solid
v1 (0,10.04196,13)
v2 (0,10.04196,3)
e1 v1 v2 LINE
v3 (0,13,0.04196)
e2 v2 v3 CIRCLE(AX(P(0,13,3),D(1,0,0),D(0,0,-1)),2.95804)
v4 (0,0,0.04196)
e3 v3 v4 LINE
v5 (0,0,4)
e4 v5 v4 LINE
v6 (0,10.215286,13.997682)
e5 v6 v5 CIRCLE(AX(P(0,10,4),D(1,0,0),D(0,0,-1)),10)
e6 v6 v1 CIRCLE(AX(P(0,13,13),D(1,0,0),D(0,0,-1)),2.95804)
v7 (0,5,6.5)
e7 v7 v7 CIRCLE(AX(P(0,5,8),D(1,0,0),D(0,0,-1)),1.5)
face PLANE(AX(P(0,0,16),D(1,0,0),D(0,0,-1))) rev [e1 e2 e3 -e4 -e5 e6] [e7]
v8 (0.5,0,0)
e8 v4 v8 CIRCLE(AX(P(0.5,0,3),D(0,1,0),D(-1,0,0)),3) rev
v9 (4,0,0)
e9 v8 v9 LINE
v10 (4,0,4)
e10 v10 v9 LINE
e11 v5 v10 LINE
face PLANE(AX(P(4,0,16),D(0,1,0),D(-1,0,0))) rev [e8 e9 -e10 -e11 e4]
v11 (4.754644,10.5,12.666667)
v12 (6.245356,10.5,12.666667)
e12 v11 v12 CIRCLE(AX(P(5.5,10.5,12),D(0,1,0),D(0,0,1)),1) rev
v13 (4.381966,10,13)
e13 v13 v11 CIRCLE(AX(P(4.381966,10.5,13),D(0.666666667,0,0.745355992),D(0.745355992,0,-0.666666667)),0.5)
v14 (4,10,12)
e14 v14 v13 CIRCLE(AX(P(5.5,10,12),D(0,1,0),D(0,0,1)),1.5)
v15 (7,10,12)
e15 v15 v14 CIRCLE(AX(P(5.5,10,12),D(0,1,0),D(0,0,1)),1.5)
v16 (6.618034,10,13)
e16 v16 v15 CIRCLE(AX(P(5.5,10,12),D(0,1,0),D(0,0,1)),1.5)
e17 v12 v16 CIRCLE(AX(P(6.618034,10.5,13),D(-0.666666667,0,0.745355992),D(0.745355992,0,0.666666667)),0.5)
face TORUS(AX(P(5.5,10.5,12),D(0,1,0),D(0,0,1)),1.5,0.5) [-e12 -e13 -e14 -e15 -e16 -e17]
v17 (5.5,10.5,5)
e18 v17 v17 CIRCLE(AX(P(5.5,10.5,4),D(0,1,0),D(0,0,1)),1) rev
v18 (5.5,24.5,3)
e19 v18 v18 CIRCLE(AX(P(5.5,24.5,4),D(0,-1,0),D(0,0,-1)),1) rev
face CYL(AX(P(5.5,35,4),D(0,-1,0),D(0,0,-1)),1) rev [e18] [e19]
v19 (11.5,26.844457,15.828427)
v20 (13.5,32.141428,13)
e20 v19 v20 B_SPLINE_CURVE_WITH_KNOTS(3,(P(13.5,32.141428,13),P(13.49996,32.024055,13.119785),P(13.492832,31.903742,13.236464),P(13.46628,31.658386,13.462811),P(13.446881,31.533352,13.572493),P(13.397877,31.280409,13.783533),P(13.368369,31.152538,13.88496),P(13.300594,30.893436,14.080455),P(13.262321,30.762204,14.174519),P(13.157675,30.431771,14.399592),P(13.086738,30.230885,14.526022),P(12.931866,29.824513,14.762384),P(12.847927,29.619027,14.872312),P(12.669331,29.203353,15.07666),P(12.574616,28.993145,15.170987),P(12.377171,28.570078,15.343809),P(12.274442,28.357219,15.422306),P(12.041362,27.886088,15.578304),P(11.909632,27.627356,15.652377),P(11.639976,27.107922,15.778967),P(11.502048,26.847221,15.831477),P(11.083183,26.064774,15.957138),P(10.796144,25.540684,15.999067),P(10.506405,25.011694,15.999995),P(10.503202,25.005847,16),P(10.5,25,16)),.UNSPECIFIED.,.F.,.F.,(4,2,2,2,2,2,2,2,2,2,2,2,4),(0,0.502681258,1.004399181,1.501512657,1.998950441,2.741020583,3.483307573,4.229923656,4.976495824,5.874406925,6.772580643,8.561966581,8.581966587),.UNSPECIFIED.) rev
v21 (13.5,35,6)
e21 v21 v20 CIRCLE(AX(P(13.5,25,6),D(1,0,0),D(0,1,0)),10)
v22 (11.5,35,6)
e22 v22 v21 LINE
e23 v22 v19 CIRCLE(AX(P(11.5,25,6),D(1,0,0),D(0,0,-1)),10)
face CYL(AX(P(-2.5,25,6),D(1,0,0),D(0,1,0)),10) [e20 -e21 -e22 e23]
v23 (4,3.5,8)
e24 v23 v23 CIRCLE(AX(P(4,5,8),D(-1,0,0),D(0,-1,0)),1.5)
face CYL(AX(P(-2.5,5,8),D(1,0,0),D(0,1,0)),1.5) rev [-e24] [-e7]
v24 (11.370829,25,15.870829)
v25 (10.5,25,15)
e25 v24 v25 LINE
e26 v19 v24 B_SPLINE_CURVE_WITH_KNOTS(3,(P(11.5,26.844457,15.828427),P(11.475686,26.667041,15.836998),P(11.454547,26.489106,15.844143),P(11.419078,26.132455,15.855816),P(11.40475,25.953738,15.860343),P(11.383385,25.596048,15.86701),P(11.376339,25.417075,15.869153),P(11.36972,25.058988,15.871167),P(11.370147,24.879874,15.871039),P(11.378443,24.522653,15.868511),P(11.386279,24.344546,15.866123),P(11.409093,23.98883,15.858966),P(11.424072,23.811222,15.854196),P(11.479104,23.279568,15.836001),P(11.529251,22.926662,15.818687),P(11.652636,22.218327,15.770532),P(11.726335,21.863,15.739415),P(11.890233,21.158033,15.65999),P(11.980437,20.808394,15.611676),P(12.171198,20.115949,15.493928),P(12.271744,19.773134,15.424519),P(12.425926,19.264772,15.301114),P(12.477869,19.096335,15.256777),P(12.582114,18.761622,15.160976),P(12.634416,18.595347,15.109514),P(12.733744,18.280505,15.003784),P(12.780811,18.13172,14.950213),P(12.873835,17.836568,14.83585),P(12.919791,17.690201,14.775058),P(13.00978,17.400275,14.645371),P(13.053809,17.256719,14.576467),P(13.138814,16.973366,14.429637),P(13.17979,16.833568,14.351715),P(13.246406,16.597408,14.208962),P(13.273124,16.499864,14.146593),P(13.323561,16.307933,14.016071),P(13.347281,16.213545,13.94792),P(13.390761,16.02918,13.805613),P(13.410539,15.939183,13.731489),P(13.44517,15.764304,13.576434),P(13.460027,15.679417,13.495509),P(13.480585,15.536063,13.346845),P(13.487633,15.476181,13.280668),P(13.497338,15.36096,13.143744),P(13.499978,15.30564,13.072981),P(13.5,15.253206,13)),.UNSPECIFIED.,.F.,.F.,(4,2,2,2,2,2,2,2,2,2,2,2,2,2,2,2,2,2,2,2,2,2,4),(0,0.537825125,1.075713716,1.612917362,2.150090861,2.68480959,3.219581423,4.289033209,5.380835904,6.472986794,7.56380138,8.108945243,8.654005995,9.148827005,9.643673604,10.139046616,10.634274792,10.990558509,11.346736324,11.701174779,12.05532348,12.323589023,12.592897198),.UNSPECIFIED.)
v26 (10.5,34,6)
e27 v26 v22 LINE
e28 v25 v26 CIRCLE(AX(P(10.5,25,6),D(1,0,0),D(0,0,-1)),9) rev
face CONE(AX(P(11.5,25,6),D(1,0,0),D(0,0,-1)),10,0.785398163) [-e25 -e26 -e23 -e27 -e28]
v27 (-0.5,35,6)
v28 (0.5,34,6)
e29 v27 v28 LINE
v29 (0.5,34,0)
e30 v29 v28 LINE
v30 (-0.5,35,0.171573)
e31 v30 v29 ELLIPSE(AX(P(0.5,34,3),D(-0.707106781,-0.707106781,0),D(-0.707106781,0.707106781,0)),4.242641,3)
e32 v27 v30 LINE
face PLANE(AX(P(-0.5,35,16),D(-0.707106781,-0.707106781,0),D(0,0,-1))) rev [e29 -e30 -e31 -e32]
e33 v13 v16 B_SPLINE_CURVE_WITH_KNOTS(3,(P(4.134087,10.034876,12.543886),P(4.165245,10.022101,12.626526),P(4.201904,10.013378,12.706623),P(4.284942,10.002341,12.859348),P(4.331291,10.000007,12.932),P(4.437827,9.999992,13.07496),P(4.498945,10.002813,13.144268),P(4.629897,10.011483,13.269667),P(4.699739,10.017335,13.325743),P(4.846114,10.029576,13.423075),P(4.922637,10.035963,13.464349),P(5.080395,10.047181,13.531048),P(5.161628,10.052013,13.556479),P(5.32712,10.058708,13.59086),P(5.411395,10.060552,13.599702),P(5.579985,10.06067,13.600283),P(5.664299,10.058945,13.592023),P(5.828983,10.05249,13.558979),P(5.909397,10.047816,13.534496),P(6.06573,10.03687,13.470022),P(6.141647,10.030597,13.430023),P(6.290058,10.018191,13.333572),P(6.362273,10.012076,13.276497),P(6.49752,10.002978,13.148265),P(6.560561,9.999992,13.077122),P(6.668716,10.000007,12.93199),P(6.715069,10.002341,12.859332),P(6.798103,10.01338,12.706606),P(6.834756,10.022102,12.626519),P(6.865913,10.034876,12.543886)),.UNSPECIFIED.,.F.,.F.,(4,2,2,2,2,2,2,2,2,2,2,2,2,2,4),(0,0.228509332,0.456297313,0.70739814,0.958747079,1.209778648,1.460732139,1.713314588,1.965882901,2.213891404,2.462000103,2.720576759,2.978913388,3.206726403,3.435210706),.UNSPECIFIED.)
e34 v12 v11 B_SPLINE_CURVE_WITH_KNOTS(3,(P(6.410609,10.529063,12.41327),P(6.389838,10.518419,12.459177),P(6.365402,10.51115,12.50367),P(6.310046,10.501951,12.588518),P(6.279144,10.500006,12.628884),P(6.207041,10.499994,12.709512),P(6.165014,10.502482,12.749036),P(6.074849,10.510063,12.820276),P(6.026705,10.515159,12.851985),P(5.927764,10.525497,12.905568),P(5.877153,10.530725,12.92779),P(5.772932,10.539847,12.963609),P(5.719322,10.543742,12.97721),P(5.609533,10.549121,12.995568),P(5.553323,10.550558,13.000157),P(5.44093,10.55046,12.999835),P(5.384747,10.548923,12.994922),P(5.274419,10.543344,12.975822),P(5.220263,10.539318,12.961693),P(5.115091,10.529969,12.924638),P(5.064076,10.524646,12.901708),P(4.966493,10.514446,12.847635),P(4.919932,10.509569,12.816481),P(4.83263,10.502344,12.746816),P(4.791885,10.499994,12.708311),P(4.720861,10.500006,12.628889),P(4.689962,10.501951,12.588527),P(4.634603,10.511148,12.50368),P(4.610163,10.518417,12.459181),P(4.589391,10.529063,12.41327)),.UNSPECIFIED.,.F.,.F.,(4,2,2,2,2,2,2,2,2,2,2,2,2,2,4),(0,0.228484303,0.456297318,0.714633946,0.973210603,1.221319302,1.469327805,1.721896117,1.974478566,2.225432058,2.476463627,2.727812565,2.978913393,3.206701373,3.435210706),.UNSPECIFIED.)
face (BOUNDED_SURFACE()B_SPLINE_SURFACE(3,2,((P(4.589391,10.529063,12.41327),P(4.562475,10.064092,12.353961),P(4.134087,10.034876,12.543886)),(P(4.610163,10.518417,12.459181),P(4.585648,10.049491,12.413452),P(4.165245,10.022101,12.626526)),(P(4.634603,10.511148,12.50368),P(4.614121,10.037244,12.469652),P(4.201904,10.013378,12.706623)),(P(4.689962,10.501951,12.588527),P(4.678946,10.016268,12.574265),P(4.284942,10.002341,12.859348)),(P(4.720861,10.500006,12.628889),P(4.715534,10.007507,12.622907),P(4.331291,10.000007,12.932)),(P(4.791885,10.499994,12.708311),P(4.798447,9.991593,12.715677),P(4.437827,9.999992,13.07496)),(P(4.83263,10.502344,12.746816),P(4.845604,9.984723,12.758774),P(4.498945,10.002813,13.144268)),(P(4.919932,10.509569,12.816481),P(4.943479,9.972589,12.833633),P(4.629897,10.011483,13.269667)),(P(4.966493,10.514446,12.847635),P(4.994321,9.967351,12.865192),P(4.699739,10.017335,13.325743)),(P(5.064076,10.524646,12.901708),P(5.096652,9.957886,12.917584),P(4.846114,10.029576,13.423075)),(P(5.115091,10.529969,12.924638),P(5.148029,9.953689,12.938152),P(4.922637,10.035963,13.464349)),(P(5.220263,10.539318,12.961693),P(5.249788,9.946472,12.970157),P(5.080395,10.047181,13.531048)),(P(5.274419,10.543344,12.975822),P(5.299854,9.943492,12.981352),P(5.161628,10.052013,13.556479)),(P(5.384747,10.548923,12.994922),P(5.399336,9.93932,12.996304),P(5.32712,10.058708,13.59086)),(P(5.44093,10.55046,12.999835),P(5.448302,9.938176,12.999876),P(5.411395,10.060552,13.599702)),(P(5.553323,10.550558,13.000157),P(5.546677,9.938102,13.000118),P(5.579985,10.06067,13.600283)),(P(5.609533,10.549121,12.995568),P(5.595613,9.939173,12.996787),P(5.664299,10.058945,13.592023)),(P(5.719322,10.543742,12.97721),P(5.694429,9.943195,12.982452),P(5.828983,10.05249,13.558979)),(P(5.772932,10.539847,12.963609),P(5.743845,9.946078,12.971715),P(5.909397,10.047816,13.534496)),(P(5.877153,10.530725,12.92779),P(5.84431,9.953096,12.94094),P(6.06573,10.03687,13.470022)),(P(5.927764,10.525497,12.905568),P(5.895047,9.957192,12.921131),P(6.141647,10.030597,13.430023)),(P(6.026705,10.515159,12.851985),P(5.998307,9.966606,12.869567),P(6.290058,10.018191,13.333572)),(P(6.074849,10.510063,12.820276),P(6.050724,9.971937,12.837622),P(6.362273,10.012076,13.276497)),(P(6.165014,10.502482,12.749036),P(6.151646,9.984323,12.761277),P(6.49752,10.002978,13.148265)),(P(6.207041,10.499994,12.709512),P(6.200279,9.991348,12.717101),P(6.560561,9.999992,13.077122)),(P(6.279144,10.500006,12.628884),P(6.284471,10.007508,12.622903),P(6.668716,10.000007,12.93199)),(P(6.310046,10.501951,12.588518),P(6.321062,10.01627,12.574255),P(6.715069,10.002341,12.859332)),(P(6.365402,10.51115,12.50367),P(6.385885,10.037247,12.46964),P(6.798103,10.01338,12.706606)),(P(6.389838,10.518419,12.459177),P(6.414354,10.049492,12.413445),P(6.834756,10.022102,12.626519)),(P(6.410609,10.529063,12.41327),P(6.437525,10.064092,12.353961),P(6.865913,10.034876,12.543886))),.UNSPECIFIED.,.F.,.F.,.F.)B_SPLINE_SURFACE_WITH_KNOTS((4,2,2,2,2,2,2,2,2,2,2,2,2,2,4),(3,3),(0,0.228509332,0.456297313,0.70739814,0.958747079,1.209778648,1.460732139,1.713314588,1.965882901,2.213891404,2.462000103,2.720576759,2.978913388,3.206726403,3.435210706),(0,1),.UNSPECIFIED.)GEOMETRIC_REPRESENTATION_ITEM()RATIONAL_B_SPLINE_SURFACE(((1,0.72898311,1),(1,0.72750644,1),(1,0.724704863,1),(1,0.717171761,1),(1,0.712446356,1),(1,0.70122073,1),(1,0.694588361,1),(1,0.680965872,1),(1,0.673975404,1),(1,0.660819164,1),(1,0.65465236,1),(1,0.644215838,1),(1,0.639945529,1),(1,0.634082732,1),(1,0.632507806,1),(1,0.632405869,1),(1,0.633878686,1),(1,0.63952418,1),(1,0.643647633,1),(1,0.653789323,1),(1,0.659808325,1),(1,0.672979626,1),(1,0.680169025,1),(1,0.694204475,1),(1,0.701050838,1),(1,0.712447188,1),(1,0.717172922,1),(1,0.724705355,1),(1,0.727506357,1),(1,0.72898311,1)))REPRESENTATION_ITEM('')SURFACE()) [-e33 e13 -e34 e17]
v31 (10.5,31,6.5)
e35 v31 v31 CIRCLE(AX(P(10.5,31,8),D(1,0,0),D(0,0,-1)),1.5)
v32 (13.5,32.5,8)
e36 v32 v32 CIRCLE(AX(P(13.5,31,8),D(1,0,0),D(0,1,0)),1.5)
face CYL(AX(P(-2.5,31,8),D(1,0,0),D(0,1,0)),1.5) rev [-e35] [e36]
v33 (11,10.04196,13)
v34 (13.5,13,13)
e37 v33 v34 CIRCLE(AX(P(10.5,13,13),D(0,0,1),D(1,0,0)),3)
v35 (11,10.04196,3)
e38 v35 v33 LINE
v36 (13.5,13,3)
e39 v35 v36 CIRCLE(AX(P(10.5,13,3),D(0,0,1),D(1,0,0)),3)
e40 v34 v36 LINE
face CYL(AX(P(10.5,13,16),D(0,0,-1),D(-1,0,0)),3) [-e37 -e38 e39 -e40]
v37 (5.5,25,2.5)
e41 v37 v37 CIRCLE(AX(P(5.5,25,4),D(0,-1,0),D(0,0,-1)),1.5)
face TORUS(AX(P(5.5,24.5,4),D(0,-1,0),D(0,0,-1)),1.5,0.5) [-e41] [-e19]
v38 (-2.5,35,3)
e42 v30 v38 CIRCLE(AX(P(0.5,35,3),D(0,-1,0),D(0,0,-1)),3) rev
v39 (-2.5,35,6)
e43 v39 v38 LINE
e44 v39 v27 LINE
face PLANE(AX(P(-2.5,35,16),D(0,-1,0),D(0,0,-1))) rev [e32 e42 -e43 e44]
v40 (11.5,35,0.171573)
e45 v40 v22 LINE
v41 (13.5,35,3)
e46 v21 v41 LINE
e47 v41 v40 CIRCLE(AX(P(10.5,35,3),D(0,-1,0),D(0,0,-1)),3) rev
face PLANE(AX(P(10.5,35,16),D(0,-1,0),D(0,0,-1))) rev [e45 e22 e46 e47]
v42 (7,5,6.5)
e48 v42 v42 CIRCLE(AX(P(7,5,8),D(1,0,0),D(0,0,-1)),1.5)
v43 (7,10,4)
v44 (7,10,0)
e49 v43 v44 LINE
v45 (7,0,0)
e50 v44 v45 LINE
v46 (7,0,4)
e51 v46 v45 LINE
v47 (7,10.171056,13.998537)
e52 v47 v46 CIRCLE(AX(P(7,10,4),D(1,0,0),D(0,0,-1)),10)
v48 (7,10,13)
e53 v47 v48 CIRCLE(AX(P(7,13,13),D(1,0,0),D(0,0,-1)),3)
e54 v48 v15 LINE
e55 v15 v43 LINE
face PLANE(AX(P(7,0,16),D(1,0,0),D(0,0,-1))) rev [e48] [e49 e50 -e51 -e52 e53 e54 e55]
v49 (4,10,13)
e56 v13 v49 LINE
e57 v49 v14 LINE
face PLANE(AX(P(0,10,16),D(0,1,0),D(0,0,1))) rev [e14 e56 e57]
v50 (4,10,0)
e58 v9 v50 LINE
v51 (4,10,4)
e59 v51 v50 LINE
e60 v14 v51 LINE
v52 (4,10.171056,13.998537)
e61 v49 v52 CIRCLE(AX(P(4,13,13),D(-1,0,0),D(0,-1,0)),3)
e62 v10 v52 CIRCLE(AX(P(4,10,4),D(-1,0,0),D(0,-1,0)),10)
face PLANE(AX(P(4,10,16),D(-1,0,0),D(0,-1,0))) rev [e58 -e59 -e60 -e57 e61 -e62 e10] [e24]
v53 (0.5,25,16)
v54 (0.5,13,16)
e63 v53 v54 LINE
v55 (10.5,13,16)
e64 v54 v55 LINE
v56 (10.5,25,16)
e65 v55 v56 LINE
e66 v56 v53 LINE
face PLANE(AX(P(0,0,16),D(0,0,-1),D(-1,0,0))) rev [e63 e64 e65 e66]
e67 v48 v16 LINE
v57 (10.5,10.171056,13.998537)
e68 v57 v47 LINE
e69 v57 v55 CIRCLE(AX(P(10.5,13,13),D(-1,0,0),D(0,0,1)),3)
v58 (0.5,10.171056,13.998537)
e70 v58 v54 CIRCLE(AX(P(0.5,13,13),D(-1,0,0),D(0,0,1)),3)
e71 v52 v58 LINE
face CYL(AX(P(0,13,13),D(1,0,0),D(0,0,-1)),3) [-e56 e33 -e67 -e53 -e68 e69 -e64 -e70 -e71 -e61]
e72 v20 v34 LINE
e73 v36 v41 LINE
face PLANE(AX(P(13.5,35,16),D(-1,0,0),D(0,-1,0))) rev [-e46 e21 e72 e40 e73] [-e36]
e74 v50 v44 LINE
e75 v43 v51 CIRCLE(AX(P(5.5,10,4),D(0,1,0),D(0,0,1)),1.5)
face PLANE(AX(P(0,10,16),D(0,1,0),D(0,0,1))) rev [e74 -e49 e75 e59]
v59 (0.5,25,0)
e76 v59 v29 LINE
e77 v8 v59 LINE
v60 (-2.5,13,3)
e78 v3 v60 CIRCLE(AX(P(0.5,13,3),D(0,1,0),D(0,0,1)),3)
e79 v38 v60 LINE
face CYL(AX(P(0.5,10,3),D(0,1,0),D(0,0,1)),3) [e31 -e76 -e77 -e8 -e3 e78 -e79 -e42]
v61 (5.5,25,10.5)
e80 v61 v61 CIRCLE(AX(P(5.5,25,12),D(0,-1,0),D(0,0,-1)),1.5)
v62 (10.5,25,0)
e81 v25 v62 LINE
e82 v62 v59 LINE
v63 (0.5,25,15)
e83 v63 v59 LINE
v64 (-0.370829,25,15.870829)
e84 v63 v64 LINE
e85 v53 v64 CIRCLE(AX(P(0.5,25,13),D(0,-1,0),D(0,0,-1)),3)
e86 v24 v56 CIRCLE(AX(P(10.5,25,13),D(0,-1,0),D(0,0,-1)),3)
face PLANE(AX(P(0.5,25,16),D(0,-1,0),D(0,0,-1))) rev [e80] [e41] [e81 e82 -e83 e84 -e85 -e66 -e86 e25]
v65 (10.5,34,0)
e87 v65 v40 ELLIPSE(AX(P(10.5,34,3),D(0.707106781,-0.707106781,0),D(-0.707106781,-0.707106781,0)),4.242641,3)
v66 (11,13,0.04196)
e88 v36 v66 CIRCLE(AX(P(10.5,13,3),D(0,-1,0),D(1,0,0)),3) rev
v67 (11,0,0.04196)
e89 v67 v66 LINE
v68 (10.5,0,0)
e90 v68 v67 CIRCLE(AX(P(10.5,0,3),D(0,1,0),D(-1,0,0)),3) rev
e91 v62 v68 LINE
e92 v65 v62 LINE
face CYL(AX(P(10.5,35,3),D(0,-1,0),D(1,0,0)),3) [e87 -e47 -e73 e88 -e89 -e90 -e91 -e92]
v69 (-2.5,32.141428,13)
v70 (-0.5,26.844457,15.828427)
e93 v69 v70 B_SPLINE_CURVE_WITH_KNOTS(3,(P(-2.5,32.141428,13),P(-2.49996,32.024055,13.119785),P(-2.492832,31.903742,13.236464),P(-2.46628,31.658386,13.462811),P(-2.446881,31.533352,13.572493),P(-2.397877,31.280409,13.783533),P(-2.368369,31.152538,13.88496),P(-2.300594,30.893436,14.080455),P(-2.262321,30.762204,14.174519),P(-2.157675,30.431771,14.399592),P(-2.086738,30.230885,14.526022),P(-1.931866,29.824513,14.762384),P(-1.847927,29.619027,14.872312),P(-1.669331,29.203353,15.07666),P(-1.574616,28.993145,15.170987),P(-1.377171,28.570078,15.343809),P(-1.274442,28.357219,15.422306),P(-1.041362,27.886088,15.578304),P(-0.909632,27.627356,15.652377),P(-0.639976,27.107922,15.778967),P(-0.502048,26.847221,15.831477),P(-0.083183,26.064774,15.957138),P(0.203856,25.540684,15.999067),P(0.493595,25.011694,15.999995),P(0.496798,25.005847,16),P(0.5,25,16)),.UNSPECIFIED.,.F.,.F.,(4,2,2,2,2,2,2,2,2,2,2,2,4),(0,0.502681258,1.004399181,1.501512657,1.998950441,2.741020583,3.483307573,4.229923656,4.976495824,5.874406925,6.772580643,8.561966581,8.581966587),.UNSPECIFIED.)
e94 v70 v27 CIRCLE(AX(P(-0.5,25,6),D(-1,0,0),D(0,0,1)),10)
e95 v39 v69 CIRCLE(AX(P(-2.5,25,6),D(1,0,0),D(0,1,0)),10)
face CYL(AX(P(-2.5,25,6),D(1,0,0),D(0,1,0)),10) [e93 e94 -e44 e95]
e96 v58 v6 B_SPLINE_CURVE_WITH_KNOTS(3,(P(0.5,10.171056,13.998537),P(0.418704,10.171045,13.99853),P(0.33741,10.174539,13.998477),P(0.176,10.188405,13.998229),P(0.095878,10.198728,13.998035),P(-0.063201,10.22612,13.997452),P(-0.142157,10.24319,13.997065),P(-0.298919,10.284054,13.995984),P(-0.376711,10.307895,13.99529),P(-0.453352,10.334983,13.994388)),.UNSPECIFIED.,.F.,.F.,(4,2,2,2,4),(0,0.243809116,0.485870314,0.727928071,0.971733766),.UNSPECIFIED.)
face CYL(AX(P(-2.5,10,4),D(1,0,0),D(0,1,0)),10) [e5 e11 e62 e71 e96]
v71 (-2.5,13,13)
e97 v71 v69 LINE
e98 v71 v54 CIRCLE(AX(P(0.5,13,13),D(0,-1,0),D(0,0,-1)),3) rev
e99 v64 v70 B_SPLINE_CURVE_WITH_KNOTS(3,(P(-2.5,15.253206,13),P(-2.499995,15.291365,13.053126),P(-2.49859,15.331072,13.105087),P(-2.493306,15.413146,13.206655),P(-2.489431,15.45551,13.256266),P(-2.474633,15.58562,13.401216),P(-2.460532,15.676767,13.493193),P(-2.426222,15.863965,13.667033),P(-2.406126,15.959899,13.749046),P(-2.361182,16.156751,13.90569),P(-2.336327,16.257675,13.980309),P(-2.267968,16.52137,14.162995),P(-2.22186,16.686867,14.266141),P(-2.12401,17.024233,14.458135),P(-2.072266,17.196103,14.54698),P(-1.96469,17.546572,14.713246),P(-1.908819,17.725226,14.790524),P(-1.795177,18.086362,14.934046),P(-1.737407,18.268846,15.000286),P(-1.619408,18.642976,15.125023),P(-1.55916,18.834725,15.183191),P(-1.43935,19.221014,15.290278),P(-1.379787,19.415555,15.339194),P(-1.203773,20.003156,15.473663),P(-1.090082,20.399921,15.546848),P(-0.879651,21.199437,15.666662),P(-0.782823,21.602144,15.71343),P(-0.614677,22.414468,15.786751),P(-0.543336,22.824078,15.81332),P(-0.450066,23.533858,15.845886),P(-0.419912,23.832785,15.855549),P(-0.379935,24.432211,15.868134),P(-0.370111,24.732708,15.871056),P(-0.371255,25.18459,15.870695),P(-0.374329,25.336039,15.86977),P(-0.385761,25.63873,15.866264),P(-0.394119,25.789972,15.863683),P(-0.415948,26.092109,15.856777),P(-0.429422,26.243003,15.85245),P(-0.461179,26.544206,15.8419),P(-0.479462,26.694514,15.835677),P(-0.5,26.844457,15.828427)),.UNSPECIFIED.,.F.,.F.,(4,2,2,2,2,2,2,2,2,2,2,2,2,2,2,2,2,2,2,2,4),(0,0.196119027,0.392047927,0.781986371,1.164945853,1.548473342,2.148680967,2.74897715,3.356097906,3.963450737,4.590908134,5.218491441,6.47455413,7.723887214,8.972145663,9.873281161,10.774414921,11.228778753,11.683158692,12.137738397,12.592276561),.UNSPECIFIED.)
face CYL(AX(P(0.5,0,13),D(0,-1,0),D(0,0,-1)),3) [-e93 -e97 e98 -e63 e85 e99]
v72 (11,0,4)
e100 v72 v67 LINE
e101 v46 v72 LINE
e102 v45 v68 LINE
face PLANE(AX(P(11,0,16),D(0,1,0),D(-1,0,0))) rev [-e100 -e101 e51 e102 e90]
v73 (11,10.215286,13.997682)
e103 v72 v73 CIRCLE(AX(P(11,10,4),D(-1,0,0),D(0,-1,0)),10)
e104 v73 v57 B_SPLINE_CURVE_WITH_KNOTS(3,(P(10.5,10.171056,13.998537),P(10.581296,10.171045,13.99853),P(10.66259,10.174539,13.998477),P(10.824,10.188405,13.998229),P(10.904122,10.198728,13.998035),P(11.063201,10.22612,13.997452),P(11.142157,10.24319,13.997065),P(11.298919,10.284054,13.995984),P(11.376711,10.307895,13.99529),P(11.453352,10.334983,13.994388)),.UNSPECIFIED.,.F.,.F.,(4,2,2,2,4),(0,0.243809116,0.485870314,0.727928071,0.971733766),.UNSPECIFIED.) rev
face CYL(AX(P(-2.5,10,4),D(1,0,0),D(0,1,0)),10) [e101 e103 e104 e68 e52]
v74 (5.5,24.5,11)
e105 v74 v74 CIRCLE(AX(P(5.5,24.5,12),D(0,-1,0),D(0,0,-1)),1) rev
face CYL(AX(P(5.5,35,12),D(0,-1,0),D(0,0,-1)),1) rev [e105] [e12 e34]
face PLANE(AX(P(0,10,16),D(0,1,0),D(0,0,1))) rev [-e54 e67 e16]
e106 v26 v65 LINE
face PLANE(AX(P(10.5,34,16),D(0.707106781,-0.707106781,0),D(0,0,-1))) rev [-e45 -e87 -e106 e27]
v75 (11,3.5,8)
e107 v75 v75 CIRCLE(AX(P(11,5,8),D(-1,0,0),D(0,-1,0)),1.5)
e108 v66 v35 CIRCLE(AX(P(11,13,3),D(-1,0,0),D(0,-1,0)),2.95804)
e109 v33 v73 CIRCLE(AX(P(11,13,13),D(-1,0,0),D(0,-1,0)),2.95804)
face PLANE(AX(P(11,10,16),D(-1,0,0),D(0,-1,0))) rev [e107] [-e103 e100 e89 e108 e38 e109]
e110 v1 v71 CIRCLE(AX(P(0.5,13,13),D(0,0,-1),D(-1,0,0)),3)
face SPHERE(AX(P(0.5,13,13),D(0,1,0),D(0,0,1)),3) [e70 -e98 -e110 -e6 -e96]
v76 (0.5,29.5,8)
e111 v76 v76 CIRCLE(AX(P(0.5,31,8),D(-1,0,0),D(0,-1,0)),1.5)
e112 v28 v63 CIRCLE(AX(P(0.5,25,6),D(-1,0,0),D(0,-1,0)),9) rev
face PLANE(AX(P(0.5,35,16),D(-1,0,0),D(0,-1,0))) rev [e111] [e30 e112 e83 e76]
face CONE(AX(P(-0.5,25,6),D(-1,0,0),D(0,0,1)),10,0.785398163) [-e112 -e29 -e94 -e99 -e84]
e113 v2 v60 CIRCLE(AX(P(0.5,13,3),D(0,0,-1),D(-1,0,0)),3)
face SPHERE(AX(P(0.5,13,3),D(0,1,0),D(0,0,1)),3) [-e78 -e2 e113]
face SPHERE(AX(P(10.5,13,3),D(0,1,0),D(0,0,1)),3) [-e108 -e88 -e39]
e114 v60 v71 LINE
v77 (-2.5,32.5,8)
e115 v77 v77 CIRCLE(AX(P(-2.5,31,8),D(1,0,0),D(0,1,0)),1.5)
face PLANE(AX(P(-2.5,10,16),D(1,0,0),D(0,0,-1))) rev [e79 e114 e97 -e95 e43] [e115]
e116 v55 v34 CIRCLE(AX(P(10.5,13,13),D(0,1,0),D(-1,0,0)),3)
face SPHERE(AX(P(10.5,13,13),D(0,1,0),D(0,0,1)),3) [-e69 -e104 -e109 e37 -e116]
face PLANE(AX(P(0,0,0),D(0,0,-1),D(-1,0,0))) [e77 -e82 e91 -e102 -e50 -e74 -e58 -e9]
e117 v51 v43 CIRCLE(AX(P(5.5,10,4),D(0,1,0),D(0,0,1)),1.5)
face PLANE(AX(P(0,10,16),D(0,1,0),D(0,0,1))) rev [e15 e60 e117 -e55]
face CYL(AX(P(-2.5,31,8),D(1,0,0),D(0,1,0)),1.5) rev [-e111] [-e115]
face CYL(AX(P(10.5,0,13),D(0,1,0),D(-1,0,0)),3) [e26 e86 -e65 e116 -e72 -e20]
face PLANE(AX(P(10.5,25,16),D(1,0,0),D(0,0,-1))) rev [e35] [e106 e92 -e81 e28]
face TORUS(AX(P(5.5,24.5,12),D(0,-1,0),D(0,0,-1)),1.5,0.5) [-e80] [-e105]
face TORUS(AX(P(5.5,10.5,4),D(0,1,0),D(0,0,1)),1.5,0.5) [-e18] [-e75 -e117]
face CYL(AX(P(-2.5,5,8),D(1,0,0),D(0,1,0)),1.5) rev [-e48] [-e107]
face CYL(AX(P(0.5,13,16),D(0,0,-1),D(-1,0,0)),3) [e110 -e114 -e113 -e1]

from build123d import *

# Parameters (mm, degrees)
BOSS_EXTRUDE1_DEPTH     = 16
CUT_EXTRUDE1_DEPTH      = 41.782962129
CUT_EXTRUDE1_DEPTH_BACK = 41.782962129
SKETCH2_R               = 1.5
FILLET1_DEPTH           = 35
SKETCH3_R               = 1
CUT_EXTRUDE2_DEPTH      = 33.607514639
CONG_2_R                = 3
CHAMFER3_SIZE           = 1
CONG_1_R                = 0.5


with BuildPart() as part:
    # Sketch1 → Boss-Extrude1 (new body)
    with BuildSketch(Plane.XY):
        Polygon((0, 0), (0, 10), (-2.5, 10), (-2.5, 35), (0.5, 35), (0.5, 25), (10.5, 25), (10.5, 35), (13.5, 35), (13.5, 10), (11, 10), (11, 0), (7, 0), (7, 10), (4, 10), (4, 0), align=None)
    extrude(amount=BOSS_EXTRUDE1_DEPTH)

    # Sketch2 → Cut-Extrude1 (cut, two sides: drawn at the far end of the back side and taken through both)
    with BuildSketch(Plane(origin=(11, 0, 0), x_dir=(0, 0, -1), z_dir=(1, 0, 0)).offset(-CUT_EXTRUDE1_DEPTH_BACK)):
        with BuildLine():
            Line((-16, 0), (-4, 0))
            ThreePointArc((-4, 0), (-11.071067812, 2.928932188), (-14, 10))
            Line((-14, 10), (-16, 10))
            Line((-16, 10), (-16, 0))
        make_face()
        with BuildLine():
            Line((-16, 35), (-16, 25))
            ThreePointArc((-16, 25), (-13.071067812, 32.071067812), (-6, 35))
            Line((-6, 35), (-16, 35))
        make_face()
        with Locations((-8, 5)):
            Circle(SKETCH2_R)
        with Locations(Location((-8, 31, 0), (0, 0, 90))):
            Circle(SKETCH2_R)
    extrude(amount=CUT_EXTRUDE1_DEPTH + CUT_EXTRUDE1_DEPTH_BACK, mode=Mode.SUBTRACT)

    # Fillet1: read off the stored shape, not the designer's step
    # Fillet1 outline → Fillet1 (cut)
    with BuildSketch(Plane(origin=(0, 0, 0), x_dir=(1, 0, 0), z_dir=(0, 1, 0))):
        with BuildLine():
            Line((13.5, 0), (10.5, 0))
            ThreePointArc((10.5, 0), (12.621320344, -0.878679656), (13.5, -3))
            Line((13.5, -3), (13.5, 0))
        make_face()
        with BuildLine():
            ThreePointArc((-2.5, -3), (-1.621320344, -0.878679656), (0.5, 0))
            Line((0.5, 0), (-2.5, 0))
            Line((-2.5, 0), (-2.5, -3))
        make_face()
        with BuildLine():
            Line((13.5, -16), (13.5, -13))
            ThreePointArc((13.5, -13), (12.621320344, -15.121320344), (10.5, -16))
            Line((10.5, -16), (13.5, -16))
        make_face()
        with BuildLine():
            ThreePointArc((0.5, -16), (-1.621320344, -15.121320344), (-2.5, -13))
            Line((-2.5, -13), (-2.5, -16))
            Line((-2.5, -16), (0.5, -16))
        make_face()
    extrude(amount=FILLET1_DEPTH, mode=Mode.SUBTRACT)

    # Sketch3 → Cut-Extrude2 (cut, through all)
    with BuildSketch(Plane.XZ.offset(-10)):
        with Locations(Location((5.5, 12, 0), (0, 0, 270))):
            Circle(SKETCH3_R)
        with Locations(Location((5.5, 4, 0), (0, 0, 270))):
            Circle(SKETCH3_R)
    extrude(amount=-CUT_EXTRUDE2_DEPTH, mode=Mode.SUBTRACT)

    # Congé2
    # the kernel refuses this fillet: 3 mm, written as the material it takes off along each edge
    with BuildSketch(Plane(origin=(10.5, 10, 16), x_dir=(0, 0, -1), z_dir=(-1, 0, 0))) as cong_2_piece_1_section:
        with BuildLine():
            CenterArc((CONG_2_R, -CONG_2_R), CONG_2_R, 90, 90)
            Line((0, -CONG_2_R), (0, 0))
            Line((0, 0), (CONG_2_R, 0))
        make_face()
    cong_2_piece_1 = extrude(amount=10, mode=Mode.PRIVATE)
    cong_2_piece_1 = cong_2_piece_1 - Plane(origin=(10.5, 10, 4), x_dir=(0, -1, 0), z_dir=(-1, 0, 0)) * Cylinder(10, 32, mode=Mode.PRIVATE)
    cong_2_piece_1 = split(cong_2_piece_1, bisect_by=Plane(origin=(7, 10, 16), z_dir=(1, 0, 0)), keep=Keep.TOP, mode=Mode.PRIVATE)
    add(cong_2_piece_1, mode=Mode.SUBTRACT)
    with BuildSketch(Plane(origin=(10.5, 10, 16), x_dir=(0, 0, -1), z_dir=(-1, 0, 0))) as cong_2_piece_2_section:
        with BuildLine():
            CenterArc((CONG_2_R, -CONG_2_R), CONG_2_R, 90, 90)
            Line((0, -CONG_2_R), (0, 0))
            Line((0, 0), (CONG_2_R, 0))
        make_face()
    cong_2_piece_2 = extrude(amount=10, mode=Mode.PRIVATE)
    cong_2_piece_2 = cong_2_piece_2 & Plane(origin=(10.5, 10, 4), x_dir=(0, -1, 0), z_dir=(-1, 0, 0)) * Cylinder(10, 32, mode=Mode.PRIVATE)
    cong_2_piece_2 = split(cong_2_piece_2, bisect_by=Plane(origin=(4, 10, 16), z_dir=(1, 0, 0)), keep=Keep.TOP, mode=Mode.PRIVATE)
    cong_2_piece_2 = split(cong_2_piece_2, bisect_by=Plane(origin=(7, 10, 16), z_dir=(-1, 0, 0)), keep=Keep.TOP, mode=Mode.PRIVATE)
    add(cong_2_piece_2, mode=Mode.SUBTRACT)
    with BuildSketch(Plane(origin=(10.5, 10, 16), x_dir=(0, 0, -1), z_dir=(-1, 0, 0))) as cong_2_piece_3_section:
        with BuildLine():
            CenterArc((CONG_2_R, -CONG_2_R), CONG_2_R, 90, 90)
            Line((0, -CONG_2_R), (0, 0))
            Line((0, 0), (CONG_2_R, 0))
        make_face()
    cong_2_piece_3 = extrude(amount=10, mode=Mode.PRIVATE)
    cong_2_piece_3 = cong_2_piece_3 - Plane(origin=(10.5, 10, 4), x_dir=(0, -1, 0), z_dir=(-1, 0, 0)) * Cylinder(10, 32, mode=Mode.PRIVATE)
    cong_2_piece_3 = split(cong_2_piece_3, bisect_by=Plane(origin=(4, 10, 16), z_dir=(1, 0, 0)), keep=Keep.TOP, mode=Mode.PRIVATE)
    cong_2_piece_3 = split(cong_2_piece_3, bisect_by=Plane(origin=(7, 10, 16), z_dir=(-1, 0, 0)), keep=Keep.TOP, mode=Mode.PRIVATE)
    add(cong_2_piece_3, mode=Mode.SUBTRACT)
    with BuildSketch(Plane(origin=(10.5, 10, 16), x_dir=(0, 0, -1), z_dir=(-1, 0, 0))) as cong_2_piece_4_section:
        with BuildLine():
            CenterArc((CONG_2_R, -CONG_2_R), CONG_2_R, 90, 90)
            Line((0, -CONG_2_R), (0, 0))
            Line((0, 0), (CONG_2_R, 0))
        make_face()
    cong_2_piece_4 = extrude(amount=10, mode=Mode.PRIVATE)
    cong_2_piece_4 = cong_2_piece_4 - Plane(origin=(10.5, 10, 4), x_dir=(0, -1, 0), z_dir=(-1, 0, 0)) * Cylinder(10, 32, mode=Mode.PRIVATE)
    cong_2_piece_4 = split(cong_2_piece_4, bisect_by=Plane(origin=(4, 10, 16), z_dir=(-1, 0, 0)), keep=Keep.TOP, mode=Mode.PRIVATE)
    add(cong_2_piece_4, mode=Mode.SUBTRACT)
    with BuildSketch(Plane(origin=(0.499999998, 10, 2.999999998), x_dir=(-1.0, 0, 5.011576341616869e-10), z_dir=(5.011576341616869e-10, 0, 1.0))) as cong_2_piece_5_section:
        with BuildLine():
            CenterArc((2.999999998 - CONG_2_R, -CONG_2_R), CONG_2_R, 0, 89.999999971)
            Line((2.999999998 - CONG_2_R, 0), (2.999999998, 0))
            Line((2.999999998, 0), (2.999999998, -CONG_2_R))
        make_face()
    cong_2_piece_5 = revolve(axis=Axis((0.499999998, 10, 2.999999998), (0, -1, 0)), revolution_arc=223.691304691, mode=Mode.PRIVATE)
    cong_2_piece_5 = split(cong_2_piece_5, bisect_by=Plane(origin=(0, 10, 2.999999998), z_dir=(-1, 0, 0)), keep=Keep.TOP, mode=Mode.PRIVATE)
    add(cong_2_piece_5, mode=Mode.SUBTRACT)
    with BuildSketch(Plane(origin=(10.500000002, 10, 2.999999998), x_dir=(-0.7230719874734535, 0, 0.6907726839787384), z_dir=(0.6907726839787384, 0, 0.7230719874734535))) as cong_2_piece_6_section:
        with BuildLine():
            CenterArc((2.999999998 - CONG_2_R, -CONG_2_R), CONG_2_R, 0, 89.999999971)
            Line((2.999999998, -CONG_2_R), (2.999999998, 0))
            Line((2.999999998, 0), (2.999999998 - CONG_2_R, 0))
        make_face()
    cong_2_piece_6 = revolve(axis=Axis((10.500000002, 10, 2.999999998), (0, -1, 0)), revolution_arc=223.691304691, mode=Mode.PRIVATE)
    cong_2_piece_6 = split(cong_2_piece_6, bisect_by=Plane(origin=(11, 10, 2.999999998), z_dir=(1, 0, 0)), keep=Keep.TOP, mode=Mode.PRIVATE)
    add(cong_2_piece_6, mode=Mode.SUBTRACT)
    with BuildSketch(Plane(origin=(13.5, 10, 3), x_dir=(-1, 0, 0), z_dir=(0, 0, 1))) as cong_2_piece_7_section:
        with BuildLine():
            CenterArc((CONG_2_R, -CONG_2_R), CONG_2_R, 90, 90)
            Line((0, -CONG_2_R), (0, 0))
            Line((0, 0), (CONG_2_R, 0))
        make_face()
    cong_2_piece_7 = extrude(amount=10, mode=Mode.PRIVATE)
    cong_2_piece_7 = split(cong_2_piece_7, bisect_by=Plane(origin=(11, 10, 3), z_dir=(1, 0, 0)), keep=Keep.TOP, mode=Mode.PRIVATE)
    add(cong_2_piece_7, mode=Mode.SUBTRACT)
    with BuildSketch(Plane(origin=(10.500000002, 10, 13.000000002), x_dir=(1.0, 0, -5.011588183995811e-10), z_dir=(-5.011588183995811e-10, 0, -1.0))) as cong_2_piece_8_section:
        with BuildLine():
            CenterArc((2.999999998 - CONG_2_R, -CONG_2_R), CONG_2_R, 0, 89.999999971)
            Line((2.999999998, -CONG_2_R), (2.999999998, 0))
            Line((2.999999998, 0), (2.999999998 - CONG_2_R, 0))
        make_face()
    cong_2_piece_8 = revolve(axis=Axis((10.500000002, 10, 13.000000002), (0, -1, 0)), revolution_arc=90.000000057, mode=Mode.PRIVATE)
    cong_2_piece_8 = cong_2_piece_8 & Plane(origin=(10.500000002, 10, 4), x_dir=(0, -1, 0), z_dir=(-1, 0, 0)) * Cylinder(10, 12, mode=Mode.PRIVATE)
    cong_2_piece_8 = split(cong_2_piece_8, bisect_by=Plane(origin=(11, 10, 13.000000002), z_dir=(1, 0, 0)), keep=Keep.TOP, mode=Mode.PRIVATE)
    add(cong_2_piece_8, mode=Mode.SUBTRACT)
    with BuildSketch(Plane(origin=(10.500000002, 10, 13.000000002), x_dir=(1.0, 0, -5.011588183995811e-10), z_dir=(-5.011588183995811e-10, 0, -1.0))) as cong_2_piece_9_section:
        with BuildLine():
            CenterArc((2.999999998 - CONG_2_R, -CONG_2_R), CONG_2_R, 0, 89.999999971)
            Line((2.999999998, -CONG_2_R), (2.999999998, 0))
            Line((2.999999998, 0), (2.999999998 - CONG_2_R, 0))
        make_face()
    cong_2_piece_9 = revolve(axis=Axis((10.500000002, 10, 13.000000002), (0, -1, 0)), revolution_arc=90.000000057, mode=Mode.PRIVATE)
    cong_2_piece_9 = cong_2_piece_9 - Plane(origin=(10.500000002, 10, 4), x_dir=(0, -1, 0), z_dir=(-1, 0, 0)) * Cylinder(10, 12, mode=Mode.PRIVATE)
    cong_2_piece_9 = split(cong_2_piece_9, bisect_by=Plane(origin=(11, 10, 13.000000002), z_dir=(-1, 0, 0)), keep=Keep.TOP, mode=Mode.PRIVATE)
    add(cong_2_piece_9, mode=Mode.SUBTRACT)
    with BuildSketch(Plane(origin=(10.500000002, 10, 13.000000002), x_dir=(1.0, 0, -5.011588183995811e-10), z_dir=(-5.011588183995811e-10, 0, -1.0))) as cong_2_piece_10_section:
        with BuildLine():
            CenterArc((2.999999998 - CONG_2_R, -CONG_2_R), CONG_2_R, 0, 89.999999971)
            Line((2.999999998, -CONG_2_R), (2.999999998, 0))
            Line((2.999999998, 0), (2.999999998 - CONG_2_R, 0))
        make_face()
    cong_2_piece_10 = revolve(axis=Axis((10.500000002, 10, 13.000000002), (0, -1, 0)), revolution_arc=90.000000057, mode=Mode.PRIVATE)
    cong_2_piece_10 = cong_2_piece_10 - Plane(origin=(10.500000002, 10, 4), x_dir=(0, -1, 0), z_dir=(-1, 0, 0)) * Cylinder(10, 12, mode=Mode.PRIVATE)
    cong_2_piece_10 = split(cong_2_piece_10, bisect_by=Plane(origin=(11, 10, 13.000000002), z_dir=(1, 0, 0)), keep=Keep.TOP, mode=Mode.PRIVATE)
    add(cong_2_piece_10, mode=Mode.SUBTRACT)
    with BuildSketch(Plane(origin=(-2.5, 10, 13), x_dir=(1, 0, 0), z_dir=(0, 0, -1))) as cong_2_piece_11_section:
        with BuildLine():
            CenterArc((CONG_2_R, -CONG_2_R), CONG_2_R, 90, 90)
            Line((0, -CONG_2_R), (0, 0))
            Line((0, 0), (CONG_2_R, 0))
        make_face()
    cong_2_piece_11 = extrude(amount=10, mode=Mode.PRIVATE)
    cong_2_piece_11 = split(cong_2_piece_11, bisect_by=Plane(origin=(0, 10, 13), z_dir=(-1, 0, 0)), keep=Keep.TOP, mode=Mode.PRIVATE)
    add(cong_2_piece_11, mode=Mode.SUBTRACT)
    with BuildSketch(Plane(origin=(0.499999998, 10, 13.000000002), x_dir=(5.011584483252393e-10, 0, 1.0), z_dir=(1.0, 0, -5.011584483252393e-10))) as cong_2_piece_12_section:
        with BuildLine():
            CenterArc((2.999999998 - CONG_2_R, -CONG_2_R), CONG_2_R, 0, 89.999999971)
            Line((2.999999998, -CONG_2_R), (2.999999998, 0))
            Line((2.999999998, 0), (2.999999998 - CONG_2_R, 0))
        make_face()
    cong_2_piece_12 = revolve(axis=Axis((0.499999998, 10, 13.000000002), (0, -1, 0)), revolution_arc=90.000000057, mode=Mode.PRIVATE)
    cong_2_piece_12 = split(cong_2_piece_12, bisect_by=Plane(origin=(0, 10, 13.000000002), z_dir=(1, 0, 0)), keep=Keep.TOP, mode=Mode.PRIVATE)
    cong_2_piece_12 = cong_2_piece_12 - Plane(origin=(0.499999998, 10, 4), x_dir=(0, -1, 0), z_dir=(-1, 0, 0)) * Cylinder(10, 12, mode=Mode.PRIVATE)
    add(cong_2_piece_12, mode=Mode.SUBTRACT)
    with BuildSketch(Plane(origin=(0.499999998, 10, 13.000000002), x_dir=(5.011584483252393e-10, 0, 1.0), z_dir=(1.0, 0, -5.011584483252393e-10))) as cong_2_piece_13_section:
        with BuildLine():
            CenterArc((2.999999998 - CONG_2_R, -CONG_2_R), CONG_2_R, 0, 89.999999971)
            Line((2.999999998, -CONG_2_R), (2.999999998, 0))
            Line((2.999999998, 0), (2.999999998 - CONG_2_R, 0))
        make_face()
    cong_2_piece_13 = revolve(axis=Axis((0.499999998, 10, 13.000000002), (0, -1, 0)), revolution_arc=90.000000057, mode=Mode.PRIVATE)
    cong_2_piece_13 = split(cong_2_piece_13, bisect_by=Plane(origin=(0, 10, 13.000000002), z_dir=(-1, 0, 0)), keep=Keep.TOP, mode=Mode.PRIVATE)
    cong_2_piece_13 = cong_2_piece_13 & Plane(origin=(0.499999998, 10, 4), x_dir=(0, -1, 0), z_dir=(-1, 0, 0)) * Cylinder(10, 12, mode=Mode.PRIVATE)
    add(cong_2_piece_13, mode=Mode.SUBTRACT)
    with BuildSketch(Plane(origin=(0.499999998, 10, 13.000000002), x_dir=(5.011584483252393e-10, 0, 1.0), z_dir=(1.0, 0, -5.011584483252393e-10))) as cong_2_piece_14_section:
        with BuildLine():
            CenterArc((2.999999998 - CONG_2_R, -CONG_2_R), CONG_2_R, 0, 89.999999971)
            Line((2.999999998, -CONG_2_R), (2.999999998, 0))
            Line((2.999999998, 0), (2.999999998 - CONG_2_R, 0))
        make_face()
    cong_2_piece_14 = revolve(axis=Axis((0.499999998, 10, 13.000000002), (0, -1, 0)), revolution_arc=90.000000057, mode=Mode.PRIVATE)
    cong_2_piece_14 = split(cong_2_piece_14, bisect_by=Plane(origin=(0, 10, 13.000000002), z_dir=(-1, 0, 0)), keep=Keep.TOP, mode=Mode.PRIVATE)
    cong_2_piece_14 = cong_2_piece_14 - Plane(origin=(0.499999998, 10, 4), x_dir=(0, -1, 0), z_dir=(-1, 0, 0)) * Cylinder(10, 12, mode=Mode.PRIVATE)
    add(cong_2_piece_14, mode=Mode.SUBTRACT)

    # Chamfer3
    # the kernel refuses this chamfer: 1 mm, written as the material it takes off along each edge
    with BuildSketch(Plane(origin=(10.5, 35, -2.571682988), x_dir=(0, -1, 0), z_dir=(0, 0, 1)), Plane(origin=(0.5, 35, -2.571682988), x_dir=(-1, 0, 0), z_dir=(0, 0, 1))) as chamfer3_piece_1:
        Polygon((CHAMFER3_SIZE, 0), (0, CHAMFER3_SIZE), (0, 0), align=None)
    extrude(amount=8.571682988, mode=Mode.SUBTRACT)
    with BuildSketch(Plane(origin=(10.5, 25, 6), x_dir=(0, 0, 1), z_dir=(0, -1, 0))) as chamfer3_piece_2:
        Polygon((10 - CHAMFER3_SIZE, 0), (10, -CHAMFER3_SIZE), (10, 0), align=None)
    revolve(axis=Axis((10.5, 25, 6), (-1, 0, 0)), revolution_arc=90, mode=Mode.SUBTRACT)
    with BuildSketch(Plane(origin=(0.5, 25, 6), x_dir=(0, 0, 1), z_dir=(0, -1, 0))) as chamfer3_piece_3:
        Polygon((10, CHAMFER3_SIZE), (10 - CHAMFER3_SIZE, 0), (10, 0), align=None)
    revolve(axis=Axis((0.5, 25, 6), (-1, 0, 0)), revolution_arc=90, mode=Mode.SUBTRACT)

    # Congé1
    cong_1_edges = [part.edges().sort_by_distance(p)[0] for p in [
        (5.5, 25, 13),
        (4.5, 10, 12),
        (5.5, 25, 5),
        (5.5, 10, 5),
    ]]
    fillet(cong_1_edges, radius=CONG_1_R - 0.0001)  # a hair under: the kernel refuses the full size


solid = part.part
